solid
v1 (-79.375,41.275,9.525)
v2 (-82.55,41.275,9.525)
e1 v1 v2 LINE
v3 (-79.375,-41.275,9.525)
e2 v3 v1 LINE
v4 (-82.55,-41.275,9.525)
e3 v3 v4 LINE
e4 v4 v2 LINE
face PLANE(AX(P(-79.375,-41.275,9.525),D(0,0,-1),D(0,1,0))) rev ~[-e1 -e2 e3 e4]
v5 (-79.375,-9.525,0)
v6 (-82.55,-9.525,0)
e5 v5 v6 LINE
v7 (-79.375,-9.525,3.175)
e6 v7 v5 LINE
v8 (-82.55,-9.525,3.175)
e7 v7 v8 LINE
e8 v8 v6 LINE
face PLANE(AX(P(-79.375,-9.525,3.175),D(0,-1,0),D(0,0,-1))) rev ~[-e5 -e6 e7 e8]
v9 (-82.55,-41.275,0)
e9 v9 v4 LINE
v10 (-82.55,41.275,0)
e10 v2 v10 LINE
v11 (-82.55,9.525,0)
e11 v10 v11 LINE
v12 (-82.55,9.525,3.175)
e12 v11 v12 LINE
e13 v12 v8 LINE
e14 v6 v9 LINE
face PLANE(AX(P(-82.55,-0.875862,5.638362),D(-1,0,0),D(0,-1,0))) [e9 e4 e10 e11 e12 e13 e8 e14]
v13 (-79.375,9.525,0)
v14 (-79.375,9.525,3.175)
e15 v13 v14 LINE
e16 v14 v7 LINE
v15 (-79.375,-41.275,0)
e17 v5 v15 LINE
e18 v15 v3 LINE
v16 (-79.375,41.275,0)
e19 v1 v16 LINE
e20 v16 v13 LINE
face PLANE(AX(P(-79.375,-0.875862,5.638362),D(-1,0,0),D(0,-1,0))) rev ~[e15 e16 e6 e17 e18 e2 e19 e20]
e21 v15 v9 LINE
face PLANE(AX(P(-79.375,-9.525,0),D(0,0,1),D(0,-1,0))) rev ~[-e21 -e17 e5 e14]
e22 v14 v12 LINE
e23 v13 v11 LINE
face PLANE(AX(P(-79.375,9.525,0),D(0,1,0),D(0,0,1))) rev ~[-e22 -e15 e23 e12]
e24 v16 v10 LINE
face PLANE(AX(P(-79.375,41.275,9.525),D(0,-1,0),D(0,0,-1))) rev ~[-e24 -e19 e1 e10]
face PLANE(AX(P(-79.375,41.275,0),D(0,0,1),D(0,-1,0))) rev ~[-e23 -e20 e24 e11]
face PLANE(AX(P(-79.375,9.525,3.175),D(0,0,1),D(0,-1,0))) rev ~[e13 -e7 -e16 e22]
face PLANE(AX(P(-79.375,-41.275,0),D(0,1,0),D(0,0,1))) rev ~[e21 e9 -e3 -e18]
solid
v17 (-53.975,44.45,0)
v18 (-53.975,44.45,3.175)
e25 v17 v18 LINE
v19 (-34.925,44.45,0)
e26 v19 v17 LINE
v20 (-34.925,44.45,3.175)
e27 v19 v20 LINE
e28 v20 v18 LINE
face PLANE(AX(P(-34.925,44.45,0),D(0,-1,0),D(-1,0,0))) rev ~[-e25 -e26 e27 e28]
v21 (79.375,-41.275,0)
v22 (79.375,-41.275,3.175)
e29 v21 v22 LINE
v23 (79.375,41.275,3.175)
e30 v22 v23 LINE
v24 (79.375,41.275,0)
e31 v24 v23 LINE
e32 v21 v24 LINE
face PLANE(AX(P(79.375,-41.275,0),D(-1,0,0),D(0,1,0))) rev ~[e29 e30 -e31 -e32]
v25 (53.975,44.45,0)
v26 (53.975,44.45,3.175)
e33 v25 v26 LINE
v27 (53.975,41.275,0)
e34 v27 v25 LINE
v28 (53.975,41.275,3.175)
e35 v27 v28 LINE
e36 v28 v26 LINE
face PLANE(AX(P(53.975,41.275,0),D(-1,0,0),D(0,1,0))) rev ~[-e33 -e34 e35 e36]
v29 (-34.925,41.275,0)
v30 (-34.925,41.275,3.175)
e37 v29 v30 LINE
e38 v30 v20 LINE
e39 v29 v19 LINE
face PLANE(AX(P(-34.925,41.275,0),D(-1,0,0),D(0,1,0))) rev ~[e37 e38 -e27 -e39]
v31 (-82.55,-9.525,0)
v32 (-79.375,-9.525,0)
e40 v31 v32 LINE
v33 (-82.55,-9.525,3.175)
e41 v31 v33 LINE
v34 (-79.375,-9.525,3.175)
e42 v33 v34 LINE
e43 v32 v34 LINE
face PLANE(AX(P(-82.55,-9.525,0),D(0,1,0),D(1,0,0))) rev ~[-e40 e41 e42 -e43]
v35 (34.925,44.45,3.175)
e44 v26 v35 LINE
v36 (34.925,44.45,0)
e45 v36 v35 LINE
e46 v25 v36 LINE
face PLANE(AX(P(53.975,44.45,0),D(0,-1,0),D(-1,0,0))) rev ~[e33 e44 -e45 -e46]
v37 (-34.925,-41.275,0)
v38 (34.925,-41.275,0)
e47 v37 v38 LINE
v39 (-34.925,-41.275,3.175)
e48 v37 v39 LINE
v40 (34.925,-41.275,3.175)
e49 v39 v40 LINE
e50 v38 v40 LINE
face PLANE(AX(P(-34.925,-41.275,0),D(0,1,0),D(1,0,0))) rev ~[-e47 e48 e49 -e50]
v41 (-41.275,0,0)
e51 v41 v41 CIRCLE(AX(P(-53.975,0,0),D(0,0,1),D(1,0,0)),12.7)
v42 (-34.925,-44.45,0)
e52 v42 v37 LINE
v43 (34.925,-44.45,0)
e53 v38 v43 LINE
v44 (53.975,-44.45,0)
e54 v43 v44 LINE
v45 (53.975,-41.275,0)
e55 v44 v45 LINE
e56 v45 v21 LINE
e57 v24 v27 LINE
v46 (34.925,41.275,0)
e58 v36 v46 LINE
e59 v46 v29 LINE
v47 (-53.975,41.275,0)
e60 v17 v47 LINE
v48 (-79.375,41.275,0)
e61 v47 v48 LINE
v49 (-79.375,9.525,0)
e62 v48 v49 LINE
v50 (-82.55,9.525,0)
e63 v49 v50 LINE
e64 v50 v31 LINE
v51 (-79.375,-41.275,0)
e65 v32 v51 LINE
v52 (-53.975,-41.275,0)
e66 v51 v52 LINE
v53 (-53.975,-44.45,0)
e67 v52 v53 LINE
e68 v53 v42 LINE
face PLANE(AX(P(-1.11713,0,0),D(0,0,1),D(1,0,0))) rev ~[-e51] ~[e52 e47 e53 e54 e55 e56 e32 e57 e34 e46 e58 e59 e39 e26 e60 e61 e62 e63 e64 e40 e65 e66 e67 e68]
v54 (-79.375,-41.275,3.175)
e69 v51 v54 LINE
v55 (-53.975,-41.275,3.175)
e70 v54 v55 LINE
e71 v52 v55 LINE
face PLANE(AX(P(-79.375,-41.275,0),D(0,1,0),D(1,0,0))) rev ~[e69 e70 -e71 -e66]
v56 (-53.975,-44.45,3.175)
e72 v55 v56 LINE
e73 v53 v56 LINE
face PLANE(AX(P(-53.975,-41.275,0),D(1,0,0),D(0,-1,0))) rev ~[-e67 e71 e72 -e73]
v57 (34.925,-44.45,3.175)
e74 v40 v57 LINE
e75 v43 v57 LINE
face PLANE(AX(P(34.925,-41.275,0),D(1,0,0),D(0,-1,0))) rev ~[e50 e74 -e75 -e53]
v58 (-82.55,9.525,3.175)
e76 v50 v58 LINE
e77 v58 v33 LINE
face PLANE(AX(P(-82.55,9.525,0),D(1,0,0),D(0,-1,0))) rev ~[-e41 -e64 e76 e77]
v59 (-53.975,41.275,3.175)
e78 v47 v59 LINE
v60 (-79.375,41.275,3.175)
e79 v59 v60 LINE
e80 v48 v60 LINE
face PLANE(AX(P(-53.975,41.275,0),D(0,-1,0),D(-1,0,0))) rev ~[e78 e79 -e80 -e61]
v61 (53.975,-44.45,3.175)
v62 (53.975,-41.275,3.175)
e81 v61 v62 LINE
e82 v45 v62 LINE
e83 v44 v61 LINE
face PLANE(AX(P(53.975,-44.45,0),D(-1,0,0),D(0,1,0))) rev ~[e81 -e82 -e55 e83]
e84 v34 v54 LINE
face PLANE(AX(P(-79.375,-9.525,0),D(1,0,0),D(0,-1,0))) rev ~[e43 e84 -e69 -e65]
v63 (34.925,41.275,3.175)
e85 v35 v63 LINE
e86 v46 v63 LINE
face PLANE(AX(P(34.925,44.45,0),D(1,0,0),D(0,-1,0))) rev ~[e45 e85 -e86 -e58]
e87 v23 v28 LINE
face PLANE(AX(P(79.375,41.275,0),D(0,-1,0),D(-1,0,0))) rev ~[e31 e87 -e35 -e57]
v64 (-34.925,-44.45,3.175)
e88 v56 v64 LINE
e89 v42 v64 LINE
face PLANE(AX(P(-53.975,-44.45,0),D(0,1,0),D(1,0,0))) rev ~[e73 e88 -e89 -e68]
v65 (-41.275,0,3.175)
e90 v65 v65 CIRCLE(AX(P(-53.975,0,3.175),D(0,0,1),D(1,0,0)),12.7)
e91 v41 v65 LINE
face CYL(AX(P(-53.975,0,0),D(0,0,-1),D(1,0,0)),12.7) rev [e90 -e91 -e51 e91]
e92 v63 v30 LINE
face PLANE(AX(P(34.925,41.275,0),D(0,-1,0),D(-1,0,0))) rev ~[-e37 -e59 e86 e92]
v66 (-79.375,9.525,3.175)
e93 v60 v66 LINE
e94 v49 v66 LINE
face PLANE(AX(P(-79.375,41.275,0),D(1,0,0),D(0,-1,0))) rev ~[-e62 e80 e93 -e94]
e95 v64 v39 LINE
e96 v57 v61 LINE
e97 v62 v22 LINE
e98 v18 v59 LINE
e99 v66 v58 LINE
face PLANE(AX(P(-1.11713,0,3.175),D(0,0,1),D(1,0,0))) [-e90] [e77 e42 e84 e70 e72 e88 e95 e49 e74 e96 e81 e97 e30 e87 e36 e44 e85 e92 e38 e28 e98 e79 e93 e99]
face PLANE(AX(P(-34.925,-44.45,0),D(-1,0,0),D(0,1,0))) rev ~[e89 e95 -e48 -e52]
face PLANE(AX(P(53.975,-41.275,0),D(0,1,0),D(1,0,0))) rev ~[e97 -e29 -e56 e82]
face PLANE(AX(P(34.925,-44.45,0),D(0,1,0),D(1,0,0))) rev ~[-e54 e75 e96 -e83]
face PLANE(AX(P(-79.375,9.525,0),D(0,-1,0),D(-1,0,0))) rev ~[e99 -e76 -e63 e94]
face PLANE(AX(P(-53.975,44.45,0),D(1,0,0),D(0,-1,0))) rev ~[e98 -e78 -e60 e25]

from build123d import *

# Parameters (mm, degrees)
F1_R     = 12.7
F2_DEPTH = 3.175
F3_W     = 31.75
F3_H     = 3.175
F4_DEPTH = 3.175


# Not quite as in the source:
# - a variable given as a bare number and used for a length is read in inches; the dataset says mm whatever the document's units were


with BuildPart() as f2:
    # F1 (on Top) → F2 (new body)
    with BuildSketch(Plane.XY):
        Polygon((-53.975, 41.275), (-79.375, 41.275), (-79.375, 9.525), (-82.55, 9.525), (-82.55, 0), (-82.55, -9.525), (-79.375, -9.525), (-79.375, -41.275), (-53.975, -41.275), (-53.975, -44.45), (-34.925, -44.45), (-34.925, -41.275), (34.925, -41.275), (34.925, -44.45), (53.975, -44.45), (53.975, -41.275), (79.375, -41.275), (79.375, 41.275), (53.975, 41.275), (53.975, 44.45), (34.925, 44.45), (34.925, 41.275), (-34.925, 41.275), (-34.925, 44.45), (-53.975, 44.45), align=None)
        with Locations((-53.975, 0)):
            Circle(F1_R, mode=Mode.SUBTRACT)
    extrude(amount=F2_DEPTH)


with BuildPart() as f4:
    # F3 (on face) → F4 (new body)
    with BuildSketch(Plane(origin=(-79.375, 0, 0), x_dir=(0, -1, 0), z_dir=(-1, 0, 0))):
        Polygon((-41.275, 9.525), (-41.275, 3.175), (-9.525, 3.175), (9.525, 3.175), (9.525, 0), (41.275, 0), (41.275, 9.525), align=None)
        with Locations((-25.4, 1.5875)):
            Rectangle(F3_W, F3_H)
    extrude(amount=F4_DEPTH)


solid = Compound([f2.part, f4.part])
